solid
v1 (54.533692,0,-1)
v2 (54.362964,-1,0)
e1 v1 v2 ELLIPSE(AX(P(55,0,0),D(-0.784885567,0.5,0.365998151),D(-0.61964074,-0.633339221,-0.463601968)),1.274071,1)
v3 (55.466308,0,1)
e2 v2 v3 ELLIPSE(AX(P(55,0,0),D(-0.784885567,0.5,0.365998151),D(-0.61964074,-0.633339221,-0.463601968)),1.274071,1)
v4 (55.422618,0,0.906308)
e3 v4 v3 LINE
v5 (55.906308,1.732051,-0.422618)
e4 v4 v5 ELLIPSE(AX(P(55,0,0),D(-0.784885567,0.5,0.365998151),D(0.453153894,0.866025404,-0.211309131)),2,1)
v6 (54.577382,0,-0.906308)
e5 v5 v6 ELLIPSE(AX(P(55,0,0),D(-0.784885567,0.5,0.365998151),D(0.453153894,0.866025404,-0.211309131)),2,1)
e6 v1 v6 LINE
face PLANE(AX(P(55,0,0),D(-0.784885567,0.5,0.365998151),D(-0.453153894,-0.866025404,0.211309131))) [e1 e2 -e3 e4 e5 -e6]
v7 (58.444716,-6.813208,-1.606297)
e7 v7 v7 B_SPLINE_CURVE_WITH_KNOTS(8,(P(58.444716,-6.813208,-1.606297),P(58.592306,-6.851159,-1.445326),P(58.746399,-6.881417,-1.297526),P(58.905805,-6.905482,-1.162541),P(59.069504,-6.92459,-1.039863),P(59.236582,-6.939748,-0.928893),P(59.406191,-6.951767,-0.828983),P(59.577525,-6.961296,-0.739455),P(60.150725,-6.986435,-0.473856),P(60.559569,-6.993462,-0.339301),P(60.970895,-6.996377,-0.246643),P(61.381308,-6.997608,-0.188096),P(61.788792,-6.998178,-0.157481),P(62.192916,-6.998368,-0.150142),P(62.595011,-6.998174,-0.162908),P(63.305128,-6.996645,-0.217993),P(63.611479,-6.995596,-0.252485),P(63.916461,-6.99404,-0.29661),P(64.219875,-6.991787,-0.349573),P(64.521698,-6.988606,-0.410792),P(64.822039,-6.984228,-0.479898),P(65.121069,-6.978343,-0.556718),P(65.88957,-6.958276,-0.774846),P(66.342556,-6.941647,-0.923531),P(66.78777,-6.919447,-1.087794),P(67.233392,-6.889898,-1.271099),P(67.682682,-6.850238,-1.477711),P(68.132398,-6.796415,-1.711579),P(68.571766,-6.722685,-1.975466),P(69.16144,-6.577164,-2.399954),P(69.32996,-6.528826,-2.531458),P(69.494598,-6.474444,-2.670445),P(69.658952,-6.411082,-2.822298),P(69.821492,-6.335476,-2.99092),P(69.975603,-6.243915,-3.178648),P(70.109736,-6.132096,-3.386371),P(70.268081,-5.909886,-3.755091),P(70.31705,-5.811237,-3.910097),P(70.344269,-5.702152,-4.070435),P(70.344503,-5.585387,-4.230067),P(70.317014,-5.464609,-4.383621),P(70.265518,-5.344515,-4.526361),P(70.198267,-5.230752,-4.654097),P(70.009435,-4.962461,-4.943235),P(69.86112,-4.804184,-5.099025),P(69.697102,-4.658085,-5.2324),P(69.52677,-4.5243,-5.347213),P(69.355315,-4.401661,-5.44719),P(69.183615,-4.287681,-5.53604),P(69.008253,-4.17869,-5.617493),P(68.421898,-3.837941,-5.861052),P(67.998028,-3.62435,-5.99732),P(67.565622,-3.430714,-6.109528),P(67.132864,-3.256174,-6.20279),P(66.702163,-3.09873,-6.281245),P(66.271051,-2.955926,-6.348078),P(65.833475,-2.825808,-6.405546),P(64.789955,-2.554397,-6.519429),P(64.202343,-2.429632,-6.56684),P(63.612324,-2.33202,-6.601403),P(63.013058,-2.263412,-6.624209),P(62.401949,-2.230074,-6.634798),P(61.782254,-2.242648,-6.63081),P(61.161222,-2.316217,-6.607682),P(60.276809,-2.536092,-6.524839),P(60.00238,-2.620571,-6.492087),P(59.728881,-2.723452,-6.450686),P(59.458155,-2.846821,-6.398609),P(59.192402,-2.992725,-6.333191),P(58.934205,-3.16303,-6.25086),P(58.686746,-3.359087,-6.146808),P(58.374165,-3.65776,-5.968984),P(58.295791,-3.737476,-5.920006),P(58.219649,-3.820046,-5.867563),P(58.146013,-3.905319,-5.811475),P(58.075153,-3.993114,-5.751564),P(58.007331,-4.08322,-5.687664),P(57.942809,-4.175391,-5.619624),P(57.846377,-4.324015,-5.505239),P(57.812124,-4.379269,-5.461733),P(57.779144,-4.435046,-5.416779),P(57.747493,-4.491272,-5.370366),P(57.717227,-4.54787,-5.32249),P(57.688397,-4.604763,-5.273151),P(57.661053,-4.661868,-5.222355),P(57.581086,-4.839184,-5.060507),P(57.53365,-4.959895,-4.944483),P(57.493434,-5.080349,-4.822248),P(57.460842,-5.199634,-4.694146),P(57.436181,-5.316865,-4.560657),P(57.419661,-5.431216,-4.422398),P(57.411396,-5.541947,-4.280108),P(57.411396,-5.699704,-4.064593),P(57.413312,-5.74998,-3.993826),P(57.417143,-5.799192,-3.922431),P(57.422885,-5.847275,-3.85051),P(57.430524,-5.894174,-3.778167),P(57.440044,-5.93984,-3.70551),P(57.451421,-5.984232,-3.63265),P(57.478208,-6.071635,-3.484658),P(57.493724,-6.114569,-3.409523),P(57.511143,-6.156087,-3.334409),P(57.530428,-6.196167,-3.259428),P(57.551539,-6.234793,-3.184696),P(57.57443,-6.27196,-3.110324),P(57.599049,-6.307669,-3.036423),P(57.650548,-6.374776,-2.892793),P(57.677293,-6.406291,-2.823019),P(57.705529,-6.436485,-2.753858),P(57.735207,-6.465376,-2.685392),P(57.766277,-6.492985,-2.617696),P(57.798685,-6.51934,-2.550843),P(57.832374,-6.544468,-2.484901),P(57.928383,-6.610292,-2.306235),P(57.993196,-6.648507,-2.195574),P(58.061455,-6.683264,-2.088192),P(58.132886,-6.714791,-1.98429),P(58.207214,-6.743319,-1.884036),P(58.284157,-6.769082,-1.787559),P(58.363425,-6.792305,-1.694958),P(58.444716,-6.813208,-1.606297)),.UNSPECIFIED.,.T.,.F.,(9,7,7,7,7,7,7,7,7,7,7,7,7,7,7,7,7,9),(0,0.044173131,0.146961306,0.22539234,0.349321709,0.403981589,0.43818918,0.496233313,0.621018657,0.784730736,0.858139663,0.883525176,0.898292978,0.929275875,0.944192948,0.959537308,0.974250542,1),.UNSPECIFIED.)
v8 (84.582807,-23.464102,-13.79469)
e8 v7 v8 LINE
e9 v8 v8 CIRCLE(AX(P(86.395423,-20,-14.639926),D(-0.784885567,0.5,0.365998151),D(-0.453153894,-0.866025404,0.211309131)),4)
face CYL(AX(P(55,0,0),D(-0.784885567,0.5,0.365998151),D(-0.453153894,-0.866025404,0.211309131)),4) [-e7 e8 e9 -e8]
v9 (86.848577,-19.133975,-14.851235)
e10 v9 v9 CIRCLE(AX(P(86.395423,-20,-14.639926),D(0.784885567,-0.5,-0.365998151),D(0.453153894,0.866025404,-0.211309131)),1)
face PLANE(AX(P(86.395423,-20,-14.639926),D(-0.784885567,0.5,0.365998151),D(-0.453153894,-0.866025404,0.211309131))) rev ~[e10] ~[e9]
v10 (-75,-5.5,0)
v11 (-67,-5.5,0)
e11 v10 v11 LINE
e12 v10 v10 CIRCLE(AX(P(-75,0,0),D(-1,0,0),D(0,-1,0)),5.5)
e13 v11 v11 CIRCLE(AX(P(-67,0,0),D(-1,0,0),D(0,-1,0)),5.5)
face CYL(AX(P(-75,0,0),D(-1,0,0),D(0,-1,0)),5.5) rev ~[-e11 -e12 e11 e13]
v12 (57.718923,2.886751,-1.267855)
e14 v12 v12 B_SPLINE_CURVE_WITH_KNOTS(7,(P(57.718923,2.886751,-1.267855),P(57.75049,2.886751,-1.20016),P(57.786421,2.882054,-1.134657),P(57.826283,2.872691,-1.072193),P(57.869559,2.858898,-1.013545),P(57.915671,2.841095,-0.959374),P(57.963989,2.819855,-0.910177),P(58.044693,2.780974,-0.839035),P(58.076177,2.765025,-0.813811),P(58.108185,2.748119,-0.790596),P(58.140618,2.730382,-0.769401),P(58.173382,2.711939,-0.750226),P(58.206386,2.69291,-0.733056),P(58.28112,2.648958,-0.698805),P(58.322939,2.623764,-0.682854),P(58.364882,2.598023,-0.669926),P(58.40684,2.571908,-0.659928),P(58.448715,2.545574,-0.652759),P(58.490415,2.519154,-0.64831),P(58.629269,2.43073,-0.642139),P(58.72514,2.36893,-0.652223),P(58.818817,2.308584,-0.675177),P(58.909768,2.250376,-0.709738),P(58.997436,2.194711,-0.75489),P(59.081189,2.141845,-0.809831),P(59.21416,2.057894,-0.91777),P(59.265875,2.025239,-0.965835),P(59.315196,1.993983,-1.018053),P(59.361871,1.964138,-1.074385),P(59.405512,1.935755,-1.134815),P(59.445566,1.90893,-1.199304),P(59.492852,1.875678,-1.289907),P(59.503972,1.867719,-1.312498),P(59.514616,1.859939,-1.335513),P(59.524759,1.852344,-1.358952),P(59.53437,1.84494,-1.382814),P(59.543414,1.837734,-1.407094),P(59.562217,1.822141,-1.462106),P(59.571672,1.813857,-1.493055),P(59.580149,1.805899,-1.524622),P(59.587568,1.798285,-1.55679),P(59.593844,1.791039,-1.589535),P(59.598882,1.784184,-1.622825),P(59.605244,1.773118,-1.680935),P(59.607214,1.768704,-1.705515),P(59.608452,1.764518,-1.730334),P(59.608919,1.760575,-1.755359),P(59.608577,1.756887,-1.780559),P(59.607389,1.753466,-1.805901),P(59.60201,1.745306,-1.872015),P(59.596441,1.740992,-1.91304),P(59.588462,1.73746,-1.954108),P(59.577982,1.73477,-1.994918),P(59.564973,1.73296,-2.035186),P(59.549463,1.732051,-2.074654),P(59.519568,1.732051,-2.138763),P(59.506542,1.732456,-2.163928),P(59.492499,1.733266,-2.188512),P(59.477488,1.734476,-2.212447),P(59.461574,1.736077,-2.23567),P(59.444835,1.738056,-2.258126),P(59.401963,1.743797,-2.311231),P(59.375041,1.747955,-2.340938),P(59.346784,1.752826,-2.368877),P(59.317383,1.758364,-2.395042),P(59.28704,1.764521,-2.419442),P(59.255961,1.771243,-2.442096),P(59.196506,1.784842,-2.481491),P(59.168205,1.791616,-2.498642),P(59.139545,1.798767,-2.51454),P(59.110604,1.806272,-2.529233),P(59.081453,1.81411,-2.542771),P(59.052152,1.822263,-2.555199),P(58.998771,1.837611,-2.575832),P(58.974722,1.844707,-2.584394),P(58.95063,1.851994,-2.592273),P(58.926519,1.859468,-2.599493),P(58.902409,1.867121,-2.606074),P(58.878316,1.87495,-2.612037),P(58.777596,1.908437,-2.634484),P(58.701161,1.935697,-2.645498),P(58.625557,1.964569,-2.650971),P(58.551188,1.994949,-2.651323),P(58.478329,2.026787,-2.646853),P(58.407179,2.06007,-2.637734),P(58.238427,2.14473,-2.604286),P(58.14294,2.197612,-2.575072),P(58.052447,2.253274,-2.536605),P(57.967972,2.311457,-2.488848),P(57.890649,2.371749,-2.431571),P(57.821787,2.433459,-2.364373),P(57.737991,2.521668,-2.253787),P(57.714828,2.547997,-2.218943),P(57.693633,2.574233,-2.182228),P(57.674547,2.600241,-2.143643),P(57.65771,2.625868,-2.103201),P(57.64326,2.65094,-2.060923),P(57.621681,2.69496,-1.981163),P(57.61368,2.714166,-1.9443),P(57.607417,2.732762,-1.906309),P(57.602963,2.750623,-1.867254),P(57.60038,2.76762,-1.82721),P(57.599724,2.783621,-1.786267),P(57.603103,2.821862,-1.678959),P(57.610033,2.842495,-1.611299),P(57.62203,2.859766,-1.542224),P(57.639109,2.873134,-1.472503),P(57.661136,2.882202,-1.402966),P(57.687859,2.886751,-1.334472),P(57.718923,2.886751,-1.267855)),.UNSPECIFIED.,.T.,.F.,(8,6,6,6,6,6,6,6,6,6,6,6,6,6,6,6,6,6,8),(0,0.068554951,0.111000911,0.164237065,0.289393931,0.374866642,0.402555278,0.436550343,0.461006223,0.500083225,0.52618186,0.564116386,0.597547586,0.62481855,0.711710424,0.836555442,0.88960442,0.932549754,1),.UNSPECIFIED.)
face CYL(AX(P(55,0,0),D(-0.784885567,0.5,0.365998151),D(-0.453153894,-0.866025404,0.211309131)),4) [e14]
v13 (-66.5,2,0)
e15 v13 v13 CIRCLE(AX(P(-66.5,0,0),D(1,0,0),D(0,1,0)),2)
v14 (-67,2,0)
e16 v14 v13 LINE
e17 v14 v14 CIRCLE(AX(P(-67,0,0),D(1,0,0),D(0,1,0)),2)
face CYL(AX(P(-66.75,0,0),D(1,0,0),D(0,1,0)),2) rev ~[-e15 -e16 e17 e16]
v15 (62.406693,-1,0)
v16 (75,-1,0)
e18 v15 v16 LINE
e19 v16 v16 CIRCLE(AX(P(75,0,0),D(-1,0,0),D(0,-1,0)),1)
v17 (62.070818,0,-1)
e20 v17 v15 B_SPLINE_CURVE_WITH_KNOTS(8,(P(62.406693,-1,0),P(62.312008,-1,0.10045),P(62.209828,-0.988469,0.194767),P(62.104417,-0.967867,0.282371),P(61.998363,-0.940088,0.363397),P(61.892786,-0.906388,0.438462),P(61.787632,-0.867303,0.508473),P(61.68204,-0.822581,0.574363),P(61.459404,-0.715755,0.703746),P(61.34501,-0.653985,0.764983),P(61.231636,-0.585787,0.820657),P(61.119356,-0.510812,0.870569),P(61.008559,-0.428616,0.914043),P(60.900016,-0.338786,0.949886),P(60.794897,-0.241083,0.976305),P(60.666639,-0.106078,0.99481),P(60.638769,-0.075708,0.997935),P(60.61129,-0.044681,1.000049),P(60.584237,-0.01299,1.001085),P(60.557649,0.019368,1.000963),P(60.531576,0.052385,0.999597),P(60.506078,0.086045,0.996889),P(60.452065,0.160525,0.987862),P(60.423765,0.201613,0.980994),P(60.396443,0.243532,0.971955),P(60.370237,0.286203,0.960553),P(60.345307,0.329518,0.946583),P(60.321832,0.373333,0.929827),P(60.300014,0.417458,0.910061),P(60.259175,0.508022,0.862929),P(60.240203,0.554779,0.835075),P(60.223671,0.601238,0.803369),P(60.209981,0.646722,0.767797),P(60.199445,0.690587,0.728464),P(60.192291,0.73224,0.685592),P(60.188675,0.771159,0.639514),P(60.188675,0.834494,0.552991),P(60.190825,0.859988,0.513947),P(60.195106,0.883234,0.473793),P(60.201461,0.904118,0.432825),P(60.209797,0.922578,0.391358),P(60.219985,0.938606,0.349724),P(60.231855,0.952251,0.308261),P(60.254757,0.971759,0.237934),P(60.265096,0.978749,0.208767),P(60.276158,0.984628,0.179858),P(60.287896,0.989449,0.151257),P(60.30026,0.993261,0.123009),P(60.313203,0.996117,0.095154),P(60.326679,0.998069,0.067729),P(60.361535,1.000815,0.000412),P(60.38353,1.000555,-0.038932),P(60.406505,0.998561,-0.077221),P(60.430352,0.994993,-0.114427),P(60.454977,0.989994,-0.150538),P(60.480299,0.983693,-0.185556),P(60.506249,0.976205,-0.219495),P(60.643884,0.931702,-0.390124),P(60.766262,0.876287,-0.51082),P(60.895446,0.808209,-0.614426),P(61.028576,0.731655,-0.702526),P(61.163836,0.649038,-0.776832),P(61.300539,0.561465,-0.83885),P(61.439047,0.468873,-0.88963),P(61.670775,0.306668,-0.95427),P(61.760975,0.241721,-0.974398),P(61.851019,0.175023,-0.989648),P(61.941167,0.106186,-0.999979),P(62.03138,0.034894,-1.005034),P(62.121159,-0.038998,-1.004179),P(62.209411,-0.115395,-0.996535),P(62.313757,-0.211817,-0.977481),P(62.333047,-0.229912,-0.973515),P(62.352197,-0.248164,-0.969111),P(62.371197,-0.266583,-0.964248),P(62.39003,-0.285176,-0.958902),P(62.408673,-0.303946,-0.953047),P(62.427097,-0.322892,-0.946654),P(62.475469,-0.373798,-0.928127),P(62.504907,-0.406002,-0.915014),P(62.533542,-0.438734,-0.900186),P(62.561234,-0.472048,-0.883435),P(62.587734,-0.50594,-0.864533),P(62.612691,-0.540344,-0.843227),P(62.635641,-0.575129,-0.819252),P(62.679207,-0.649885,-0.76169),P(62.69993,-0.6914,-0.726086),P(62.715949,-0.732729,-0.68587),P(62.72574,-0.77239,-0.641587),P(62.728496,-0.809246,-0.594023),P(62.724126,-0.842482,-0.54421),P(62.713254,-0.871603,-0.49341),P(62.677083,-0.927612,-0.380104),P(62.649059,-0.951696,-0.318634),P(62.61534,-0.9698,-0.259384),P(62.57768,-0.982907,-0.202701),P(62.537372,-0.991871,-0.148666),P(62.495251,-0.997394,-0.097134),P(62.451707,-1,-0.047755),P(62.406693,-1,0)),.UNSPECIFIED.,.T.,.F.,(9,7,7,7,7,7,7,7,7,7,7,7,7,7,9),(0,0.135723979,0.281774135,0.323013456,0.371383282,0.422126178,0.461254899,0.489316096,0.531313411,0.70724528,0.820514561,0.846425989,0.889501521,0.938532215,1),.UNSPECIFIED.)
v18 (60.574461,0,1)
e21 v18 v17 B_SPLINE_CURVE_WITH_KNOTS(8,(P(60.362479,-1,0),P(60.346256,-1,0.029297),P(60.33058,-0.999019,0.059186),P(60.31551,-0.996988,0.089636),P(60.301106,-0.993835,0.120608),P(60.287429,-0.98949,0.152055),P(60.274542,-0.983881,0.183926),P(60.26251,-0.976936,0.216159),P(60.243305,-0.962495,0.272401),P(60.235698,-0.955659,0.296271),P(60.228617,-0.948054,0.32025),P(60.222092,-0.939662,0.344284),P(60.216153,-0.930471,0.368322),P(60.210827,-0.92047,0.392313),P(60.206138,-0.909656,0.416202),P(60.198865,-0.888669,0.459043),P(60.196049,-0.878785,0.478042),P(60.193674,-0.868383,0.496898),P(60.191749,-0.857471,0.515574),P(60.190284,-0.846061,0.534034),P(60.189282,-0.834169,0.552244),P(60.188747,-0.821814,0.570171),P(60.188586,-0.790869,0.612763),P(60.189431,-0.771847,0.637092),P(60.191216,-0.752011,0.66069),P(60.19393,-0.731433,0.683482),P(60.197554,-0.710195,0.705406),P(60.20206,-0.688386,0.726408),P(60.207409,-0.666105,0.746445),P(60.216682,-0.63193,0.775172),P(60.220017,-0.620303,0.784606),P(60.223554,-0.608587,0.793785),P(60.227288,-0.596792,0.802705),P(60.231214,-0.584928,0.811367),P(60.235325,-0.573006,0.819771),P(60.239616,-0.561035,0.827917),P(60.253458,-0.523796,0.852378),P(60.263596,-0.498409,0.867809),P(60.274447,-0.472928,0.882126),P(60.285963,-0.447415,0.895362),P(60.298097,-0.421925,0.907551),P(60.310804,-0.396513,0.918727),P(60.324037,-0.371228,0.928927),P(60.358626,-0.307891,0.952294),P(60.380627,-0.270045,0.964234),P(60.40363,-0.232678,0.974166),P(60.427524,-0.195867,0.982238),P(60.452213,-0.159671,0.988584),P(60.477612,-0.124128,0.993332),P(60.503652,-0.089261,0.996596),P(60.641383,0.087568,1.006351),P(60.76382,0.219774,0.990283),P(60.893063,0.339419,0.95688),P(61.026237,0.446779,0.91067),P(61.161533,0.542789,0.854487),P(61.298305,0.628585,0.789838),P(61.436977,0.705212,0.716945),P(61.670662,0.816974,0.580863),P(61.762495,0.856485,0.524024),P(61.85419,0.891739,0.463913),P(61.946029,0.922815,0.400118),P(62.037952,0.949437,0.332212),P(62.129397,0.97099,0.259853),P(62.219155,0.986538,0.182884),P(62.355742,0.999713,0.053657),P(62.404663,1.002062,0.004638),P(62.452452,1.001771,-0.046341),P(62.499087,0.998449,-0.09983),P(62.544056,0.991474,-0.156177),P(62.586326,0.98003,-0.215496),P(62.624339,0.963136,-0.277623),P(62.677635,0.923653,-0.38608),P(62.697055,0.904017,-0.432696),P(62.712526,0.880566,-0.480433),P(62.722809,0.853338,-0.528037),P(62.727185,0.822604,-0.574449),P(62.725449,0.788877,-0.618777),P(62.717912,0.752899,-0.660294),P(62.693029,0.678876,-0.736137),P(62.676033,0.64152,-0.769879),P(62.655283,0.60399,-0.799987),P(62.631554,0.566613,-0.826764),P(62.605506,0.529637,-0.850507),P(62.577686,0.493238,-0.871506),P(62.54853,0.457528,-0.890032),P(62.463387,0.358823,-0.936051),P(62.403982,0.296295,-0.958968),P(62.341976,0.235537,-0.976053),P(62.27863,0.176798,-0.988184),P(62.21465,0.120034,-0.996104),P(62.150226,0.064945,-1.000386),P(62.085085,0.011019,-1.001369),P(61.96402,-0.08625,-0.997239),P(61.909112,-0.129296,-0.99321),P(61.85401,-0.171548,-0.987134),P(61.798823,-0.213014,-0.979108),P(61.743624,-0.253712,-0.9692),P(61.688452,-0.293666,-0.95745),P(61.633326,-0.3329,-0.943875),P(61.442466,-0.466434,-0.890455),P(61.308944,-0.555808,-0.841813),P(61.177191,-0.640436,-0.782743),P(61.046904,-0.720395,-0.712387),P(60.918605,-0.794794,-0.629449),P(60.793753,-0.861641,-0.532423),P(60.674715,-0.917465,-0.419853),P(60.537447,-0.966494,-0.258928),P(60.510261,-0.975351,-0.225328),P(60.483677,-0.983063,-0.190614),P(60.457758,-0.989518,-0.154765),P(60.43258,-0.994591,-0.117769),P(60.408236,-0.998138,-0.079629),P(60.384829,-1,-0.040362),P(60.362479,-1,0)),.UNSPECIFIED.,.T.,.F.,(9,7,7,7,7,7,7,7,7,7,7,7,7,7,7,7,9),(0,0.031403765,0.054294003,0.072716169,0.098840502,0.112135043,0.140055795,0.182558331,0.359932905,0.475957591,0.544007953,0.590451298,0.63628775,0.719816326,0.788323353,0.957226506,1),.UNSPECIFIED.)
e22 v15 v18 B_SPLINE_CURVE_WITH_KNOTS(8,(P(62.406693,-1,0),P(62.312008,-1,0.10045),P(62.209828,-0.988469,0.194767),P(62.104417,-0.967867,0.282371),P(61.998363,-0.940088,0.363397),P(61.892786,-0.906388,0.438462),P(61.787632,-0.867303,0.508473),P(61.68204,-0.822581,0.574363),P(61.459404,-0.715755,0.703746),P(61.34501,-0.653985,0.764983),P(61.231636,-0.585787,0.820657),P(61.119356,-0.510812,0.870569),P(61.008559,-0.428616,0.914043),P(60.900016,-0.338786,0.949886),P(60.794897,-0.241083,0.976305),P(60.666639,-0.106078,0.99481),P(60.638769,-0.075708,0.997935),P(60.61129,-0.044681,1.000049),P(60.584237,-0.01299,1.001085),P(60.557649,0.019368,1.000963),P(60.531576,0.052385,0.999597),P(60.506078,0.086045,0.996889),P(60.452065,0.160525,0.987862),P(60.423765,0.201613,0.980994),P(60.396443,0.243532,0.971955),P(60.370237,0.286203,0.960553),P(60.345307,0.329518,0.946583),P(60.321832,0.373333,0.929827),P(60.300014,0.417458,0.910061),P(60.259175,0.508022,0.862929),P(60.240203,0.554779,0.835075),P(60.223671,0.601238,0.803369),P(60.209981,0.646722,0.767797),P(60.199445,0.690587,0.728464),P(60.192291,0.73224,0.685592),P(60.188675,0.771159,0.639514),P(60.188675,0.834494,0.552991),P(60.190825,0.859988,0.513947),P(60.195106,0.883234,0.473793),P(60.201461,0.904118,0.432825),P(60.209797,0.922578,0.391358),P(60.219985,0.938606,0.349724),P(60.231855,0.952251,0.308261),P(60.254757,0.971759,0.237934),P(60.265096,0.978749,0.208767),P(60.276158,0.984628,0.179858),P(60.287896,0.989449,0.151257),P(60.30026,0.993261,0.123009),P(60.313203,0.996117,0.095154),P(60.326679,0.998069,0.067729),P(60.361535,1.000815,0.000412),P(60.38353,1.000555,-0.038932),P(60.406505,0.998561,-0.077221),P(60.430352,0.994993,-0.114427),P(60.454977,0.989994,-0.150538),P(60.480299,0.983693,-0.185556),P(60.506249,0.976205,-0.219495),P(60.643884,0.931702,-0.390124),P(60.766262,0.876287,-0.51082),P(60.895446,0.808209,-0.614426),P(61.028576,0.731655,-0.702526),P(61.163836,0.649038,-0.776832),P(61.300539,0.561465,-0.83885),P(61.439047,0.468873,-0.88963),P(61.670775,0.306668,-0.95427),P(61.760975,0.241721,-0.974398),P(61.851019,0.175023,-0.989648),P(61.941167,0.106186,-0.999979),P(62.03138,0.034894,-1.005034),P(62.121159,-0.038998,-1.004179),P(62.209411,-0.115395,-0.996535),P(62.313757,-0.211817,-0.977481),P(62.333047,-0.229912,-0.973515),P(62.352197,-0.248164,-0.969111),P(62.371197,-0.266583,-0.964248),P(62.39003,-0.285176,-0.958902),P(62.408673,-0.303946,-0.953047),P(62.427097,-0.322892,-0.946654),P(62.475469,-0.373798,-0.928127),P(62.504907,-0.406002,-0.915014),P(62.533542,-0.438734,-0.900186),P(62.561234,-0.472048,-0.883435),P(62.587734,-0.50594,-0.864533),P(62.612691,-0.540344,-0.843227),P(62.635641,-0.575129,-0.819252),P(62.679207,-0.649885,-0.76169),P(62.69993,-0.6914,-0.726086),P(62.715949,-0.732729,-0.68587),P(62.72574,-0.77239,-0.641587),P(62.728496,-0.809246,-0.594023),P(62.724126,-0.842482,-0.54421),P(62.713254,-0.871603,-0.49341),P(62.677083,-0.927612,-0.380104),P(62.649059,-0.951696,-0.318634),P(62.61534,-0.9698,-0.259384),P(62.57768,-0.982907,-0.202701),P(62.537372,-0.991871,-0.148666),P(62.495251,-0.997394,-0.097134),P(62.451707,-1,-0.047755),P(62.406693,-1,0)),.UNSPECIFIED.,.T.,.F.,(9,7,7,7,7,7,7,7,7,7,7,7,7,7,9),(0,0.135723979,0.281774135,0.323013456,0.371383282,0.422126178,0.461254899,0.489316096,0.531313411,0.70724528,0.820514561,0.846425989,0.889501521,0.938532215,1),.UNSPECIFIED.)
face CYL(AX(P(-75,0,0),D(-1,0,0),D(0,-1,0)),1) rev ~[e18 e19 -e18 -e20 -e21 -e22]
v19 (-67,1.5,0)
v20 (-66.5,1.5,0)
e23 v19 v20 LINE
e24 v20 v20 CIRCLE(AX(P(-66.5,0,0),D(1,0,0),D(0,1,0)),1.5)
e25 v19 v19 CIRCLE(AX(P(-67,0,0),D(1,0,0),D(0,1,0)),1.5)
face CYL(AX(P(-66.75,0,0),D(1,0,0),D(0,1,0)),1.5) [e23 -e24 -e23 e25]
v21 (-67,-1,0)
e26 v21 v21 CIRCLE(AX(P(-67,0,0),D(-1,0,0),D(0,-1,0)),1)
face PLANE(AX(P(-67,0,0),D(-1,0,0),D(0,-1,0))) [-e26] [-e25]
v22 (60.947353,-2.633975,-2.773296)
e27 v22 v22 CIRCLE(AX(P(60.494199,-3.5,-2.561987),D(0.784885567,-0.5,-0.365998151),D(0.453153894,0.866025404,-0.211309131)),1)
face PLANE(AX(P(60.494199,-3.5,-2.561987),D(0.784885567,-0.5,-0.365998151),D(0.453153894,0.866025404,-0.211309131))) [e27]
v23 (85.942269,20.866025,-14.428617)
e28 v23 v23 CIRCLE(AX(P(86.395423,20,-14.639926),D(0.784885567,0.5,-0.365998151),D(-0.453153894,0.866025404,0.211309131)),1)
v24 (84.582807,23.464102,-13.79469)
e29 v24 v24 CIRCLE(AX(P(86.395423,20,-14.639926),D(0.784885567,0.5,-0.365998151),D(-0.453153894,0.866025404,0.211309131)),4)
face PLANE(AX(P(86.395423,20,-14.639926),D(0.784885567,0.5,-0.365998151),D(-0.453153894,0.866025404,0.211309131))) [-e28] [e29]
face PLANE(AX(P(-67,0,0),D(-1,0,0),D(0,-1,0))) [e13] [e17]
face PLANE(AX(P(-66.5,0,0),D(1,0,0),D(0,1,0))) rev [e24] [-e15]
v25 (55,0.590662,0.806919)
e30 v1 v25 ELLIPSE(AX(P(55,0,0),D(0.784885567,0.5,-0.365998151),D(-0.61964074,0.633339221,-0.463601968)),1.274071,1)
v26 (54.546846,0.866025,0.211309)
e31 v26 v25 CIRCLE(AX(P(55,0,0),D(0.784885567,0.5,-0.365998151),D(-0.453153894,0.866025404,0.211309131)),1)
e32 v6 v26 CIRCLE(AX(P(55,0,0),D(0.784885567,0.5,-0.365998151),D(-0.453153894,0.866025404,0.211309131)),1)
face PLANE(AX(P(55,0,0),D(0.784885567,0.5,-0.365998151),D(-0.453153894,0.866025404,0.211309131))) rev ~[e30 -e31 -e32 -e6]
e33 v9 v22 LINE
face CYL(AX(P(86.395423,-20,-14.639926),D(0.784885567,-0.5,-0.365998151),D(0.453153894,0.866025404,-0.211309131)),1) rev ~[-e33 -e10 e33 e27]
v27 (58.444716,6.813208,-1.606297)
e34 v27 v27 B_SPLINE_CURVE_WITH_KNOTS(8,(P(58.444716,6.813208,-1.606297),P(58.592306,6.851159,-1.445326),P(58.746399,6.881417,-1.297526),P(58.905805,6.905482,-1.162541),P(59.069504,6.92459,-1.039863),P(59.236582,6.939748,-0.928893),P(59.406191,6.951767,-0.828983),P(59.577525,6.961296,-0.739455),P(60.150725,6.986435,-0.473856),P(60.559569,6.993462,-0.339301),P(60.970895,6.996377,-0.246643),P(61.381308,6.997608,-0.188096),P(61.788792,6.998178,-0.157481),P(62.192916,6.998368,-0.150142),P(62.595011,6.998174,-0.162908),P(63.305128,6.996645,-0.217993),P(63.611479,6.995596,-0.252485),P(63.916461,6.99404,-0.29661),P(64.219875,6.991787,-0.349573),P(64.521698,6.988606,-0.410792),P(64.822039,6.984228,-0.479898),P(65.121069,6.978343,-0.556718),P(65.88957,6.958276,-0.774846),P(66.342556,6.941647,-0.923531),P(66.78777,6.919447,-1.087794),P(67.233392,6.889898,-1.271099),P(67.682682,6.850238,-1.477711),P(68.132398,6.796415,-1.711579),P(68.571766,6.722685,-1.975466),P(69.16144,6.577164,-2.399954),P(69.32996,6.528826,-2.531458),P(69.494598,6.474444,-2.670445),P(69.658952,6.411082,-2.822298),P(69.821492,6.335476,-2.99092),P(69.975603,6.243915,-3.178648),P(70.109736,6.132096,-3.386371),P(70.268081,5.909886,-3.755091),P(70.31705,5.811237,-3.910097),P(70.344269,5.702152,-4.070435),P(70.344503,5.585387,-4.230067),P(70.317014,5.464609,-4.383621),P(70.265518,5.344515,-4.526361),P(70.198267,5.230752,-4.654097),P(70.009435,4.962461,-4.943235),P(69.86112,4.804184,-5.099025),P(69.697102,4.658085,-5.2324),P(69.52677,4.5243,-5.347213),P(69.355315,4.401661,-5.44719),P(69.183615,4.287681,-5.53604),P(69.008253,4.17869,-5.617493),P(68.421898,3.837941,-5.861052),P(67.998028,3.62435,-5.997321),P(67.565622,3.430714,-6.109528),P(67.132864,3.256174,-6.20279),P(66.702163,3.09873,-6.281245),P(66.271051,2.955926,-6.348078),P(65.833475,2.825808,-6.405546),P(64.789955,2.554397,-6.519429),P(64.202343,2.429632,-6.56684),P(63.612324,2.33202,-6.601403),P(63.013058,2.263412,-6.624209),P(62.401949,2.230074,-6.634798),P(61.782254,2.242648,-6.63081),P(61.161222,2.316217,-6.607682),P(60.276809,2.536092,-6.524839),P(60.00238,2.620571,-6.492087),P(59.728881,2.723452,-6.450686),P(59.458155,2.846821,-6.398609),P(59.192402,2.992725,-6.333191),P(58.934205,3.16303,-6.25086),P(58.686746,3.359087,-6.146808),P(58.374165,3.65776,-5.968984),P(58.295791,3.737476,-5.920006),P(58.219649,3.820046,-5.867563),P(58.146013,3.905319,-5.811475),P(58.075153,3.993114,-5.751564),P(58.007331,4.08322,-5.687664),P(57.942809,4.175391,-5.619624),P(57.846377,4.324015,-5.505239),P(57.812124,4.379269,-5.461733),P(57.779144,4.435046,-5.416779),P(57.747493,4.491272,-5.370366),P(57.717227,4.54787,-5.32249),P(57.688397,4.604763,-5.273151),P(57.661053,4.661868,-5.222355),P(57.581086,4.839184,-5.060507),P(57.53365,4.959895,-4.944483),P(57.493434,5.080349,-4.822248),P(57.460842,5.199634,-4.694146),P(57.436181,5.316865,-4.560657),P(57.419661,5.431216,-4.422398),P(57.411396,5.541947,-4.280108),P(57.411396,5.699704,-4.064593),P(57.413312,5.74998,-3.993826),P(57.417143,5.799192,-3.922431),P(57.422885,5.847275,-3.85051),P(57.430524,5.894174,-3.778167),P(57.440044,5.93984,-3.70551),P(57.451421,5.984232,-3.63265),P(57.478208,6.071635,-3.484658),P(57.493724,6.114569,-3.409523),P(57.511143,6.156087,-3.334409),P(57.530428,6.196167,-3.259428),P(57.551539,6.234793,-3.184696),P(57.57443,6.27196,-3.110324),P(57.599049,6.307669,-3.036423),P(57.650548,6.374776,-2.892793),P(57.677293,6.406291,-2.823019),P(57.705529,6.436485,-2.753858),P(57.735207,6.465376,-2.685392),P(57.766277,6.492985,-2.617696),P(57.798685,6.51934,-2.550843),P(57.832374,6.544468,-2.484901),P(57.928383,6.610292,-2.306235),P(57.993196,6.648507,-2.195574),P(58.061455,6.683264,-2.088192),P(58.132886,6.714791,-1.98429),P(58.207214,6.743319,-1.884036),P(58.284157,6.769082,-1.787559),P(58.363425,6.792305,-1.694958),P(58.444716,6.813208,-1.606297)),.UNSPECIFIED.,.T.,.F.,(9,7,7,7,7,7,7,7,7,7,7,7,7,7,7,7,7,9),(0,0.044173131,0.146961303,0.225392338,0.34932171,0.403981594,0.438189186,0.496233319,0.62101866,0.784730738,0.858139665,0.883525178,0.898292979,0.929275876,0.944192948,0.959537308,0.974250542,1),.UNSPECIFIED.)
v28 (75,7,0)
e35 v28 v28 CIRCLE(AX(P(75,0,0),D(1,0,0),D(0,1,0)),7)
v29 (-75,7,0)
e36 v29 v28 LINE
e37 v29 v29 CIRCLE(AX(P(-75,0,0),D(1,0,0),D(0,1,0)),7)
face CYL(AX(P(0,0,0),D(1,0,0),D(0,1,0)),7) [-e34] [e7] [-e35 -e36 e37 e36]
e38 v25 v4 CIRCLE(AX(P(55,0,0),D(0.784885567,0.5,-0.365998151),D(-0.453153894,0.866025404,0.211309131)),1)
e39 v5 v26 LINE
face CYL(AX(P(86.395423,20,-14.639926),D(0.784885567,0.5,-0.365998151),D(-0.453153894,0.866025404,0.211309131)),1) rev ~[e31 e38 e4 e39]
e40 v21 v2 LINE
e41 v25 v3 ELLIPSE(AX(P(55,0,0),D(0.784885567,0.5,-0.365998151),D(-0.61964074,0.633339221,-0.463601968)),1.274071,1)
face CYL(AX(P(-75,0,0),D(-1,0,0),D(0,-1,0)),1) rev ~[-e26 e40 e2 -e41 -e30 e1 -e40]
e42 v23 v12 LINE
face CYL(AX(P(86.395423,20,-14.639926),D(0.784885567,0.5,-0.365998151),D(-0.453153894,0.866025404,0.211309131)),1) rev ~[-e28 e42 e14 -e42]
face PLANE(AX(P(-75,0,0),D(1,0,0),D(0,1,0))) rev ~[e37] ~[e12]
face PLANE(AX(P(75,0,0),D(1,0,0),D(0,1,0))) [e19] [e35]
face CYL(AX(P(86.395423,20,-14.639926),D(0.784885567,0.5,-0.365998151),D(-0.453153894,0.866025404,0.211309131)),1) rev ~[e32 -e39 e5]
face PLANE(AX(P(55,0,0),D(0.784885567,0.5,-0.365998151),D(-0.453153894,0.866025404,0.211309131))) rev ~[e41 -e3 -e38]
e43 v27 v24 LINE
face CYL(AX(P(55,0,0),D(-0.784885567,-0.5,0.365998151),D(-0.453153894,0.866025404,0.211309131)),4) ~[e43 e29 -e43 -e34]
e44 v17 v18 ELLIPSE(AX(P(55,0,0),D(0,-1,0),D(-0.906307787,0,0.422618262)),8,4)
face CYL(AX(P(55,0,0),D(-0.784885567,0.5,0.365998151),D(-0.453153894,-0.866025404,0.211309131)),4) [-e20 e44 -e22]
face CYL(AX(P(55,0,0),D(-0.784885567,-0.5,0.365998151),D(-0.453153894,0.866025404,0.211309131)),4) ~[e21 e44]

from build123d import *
from build123d import SkipClean  # not in build123d's __all__

# Parameters (mm, degrees)
F0_R      = 7
F1_DEPTH  = 75
F2_R      = 1
F3_DEPTH  = 150.001
F4_R      = 5.5
F4_R_2    = 1
F5_DEPTH  = 8
F6_W      = 0.5
F6_H      = 0.5
F13_R     = 4
F14_DEPTH = 40
F16_R     = 1
F17_DEPTH = 40
F18_R     = 4
F19_DEPTH = 40
F20_R     = 1
F21_DEPTH = 33


with BuildPart() as f1:
    # F0 (on Right) → F1 (new body, symmetric)
    with BuildSketch(Plane.YZ):
        Circle(F0_R)
    extrude(amount=F1_DEPTH, both=True)

    # F2 (on face) → F3 (cut, through all)
    with BuildSketch(Plane(origin=(-75, 0, 0), x_dir=(0, -1, 0), z_dir=(-1, 0, 0))):
        Circle(F2_R)
    extrude(amount=-F3_DEPTH, mode=Mode.SUBTRACT)

    # F4 (on face) → F5 (cut)
    with BuildSketch(Plane(origin=(-75, 0, 0), x_dir=(0, -1, 0), z_dir=(-1, 0, 0))):
        Circle(F4_R)
        Circle(F4_R_2, mode=Mode.SUBTRACT)
    extrude(amount=-F5_DEPTH, mode=Mode.SUBTRACT)

    # F6 (on Top) → F7 (revolve, cut)
    with BuildSketch(Plane.XY):
        with Locations((-66.75, 1.75)):
            Rectangle(F6_W, F6_H)
    revolve(axis=Axis((-60.2624397725, 0, 0), (1, 0, 0)), mode=Mode.SUBTRACT)

    # F13 (on face) → F14 (join)
    with BuildSketch(Plane(origin=(33.8824944498, 21.5843530986, -15.7996666393), x_dir=(-0.4531538935, 0.8660254038, 0.2113091309), z_dir=(0.7848855672, 0.5, -0.3659981508))):
        with Locations((-24.9234641435, 23.2440043957)):
            Circle(F13_R)
    extrude(amount=F14_DEPTH)

    # F16 (on face) → F17 (cut)
    with BuildSketch(Plane(origin=(65.2779171386, 41.5843530986, -30.4395926702), x_dir=(-0.4531538935, 0.8660254038, 0.2113091309), z_dir=(0.7848855672, 0.5, -0.3659981508))):
        with Locations((-24.9234641435, 23.2440043957)):
            Circle(F16_R)
    extrude(amount=-F17_DEPTH, mode=Mode.SUBTRACT)

    # F18 (on face) → F19 (join)
    with BuildSketch(Plane(origin=(33.8824944498, -21.5843530986, -15.7996666393), x_dir=(-0.4531538935, -0.8660254038, 0.2113091309), z_dir=(-0.7848855672, 0.5, 0.3659981508))):
        with Locations((-24.9234641435, 23.2440043957)):
            Circle(F18_R)
    with SkipClean():  # cleaning this boolean's faces spoils the solid; the shape is the same uncleaned
        extrude(amount=-F19_DEPTH)

    # F20 (on face) → F21 (cut)
    with BuildSketch(Plane(origin=(65.2779171386, -41.5843530986, -30.4395926702), x_dir=(0.4531538935, 0.8660254038, -0.2113091309), z_dir=(0.7848855672, -0.5, -0.3659981508))):
        with Locations((24.9234641435, 23.2440043957)):
            Circle(F20_R)
    with SkipClean():  # cleaning this boolean's faces spoils the solid; the shape is the same uncleaned
        extrude(amount=-F21_DEPTH, mode=Mode.SUBTRACT)


solid = f1.part
